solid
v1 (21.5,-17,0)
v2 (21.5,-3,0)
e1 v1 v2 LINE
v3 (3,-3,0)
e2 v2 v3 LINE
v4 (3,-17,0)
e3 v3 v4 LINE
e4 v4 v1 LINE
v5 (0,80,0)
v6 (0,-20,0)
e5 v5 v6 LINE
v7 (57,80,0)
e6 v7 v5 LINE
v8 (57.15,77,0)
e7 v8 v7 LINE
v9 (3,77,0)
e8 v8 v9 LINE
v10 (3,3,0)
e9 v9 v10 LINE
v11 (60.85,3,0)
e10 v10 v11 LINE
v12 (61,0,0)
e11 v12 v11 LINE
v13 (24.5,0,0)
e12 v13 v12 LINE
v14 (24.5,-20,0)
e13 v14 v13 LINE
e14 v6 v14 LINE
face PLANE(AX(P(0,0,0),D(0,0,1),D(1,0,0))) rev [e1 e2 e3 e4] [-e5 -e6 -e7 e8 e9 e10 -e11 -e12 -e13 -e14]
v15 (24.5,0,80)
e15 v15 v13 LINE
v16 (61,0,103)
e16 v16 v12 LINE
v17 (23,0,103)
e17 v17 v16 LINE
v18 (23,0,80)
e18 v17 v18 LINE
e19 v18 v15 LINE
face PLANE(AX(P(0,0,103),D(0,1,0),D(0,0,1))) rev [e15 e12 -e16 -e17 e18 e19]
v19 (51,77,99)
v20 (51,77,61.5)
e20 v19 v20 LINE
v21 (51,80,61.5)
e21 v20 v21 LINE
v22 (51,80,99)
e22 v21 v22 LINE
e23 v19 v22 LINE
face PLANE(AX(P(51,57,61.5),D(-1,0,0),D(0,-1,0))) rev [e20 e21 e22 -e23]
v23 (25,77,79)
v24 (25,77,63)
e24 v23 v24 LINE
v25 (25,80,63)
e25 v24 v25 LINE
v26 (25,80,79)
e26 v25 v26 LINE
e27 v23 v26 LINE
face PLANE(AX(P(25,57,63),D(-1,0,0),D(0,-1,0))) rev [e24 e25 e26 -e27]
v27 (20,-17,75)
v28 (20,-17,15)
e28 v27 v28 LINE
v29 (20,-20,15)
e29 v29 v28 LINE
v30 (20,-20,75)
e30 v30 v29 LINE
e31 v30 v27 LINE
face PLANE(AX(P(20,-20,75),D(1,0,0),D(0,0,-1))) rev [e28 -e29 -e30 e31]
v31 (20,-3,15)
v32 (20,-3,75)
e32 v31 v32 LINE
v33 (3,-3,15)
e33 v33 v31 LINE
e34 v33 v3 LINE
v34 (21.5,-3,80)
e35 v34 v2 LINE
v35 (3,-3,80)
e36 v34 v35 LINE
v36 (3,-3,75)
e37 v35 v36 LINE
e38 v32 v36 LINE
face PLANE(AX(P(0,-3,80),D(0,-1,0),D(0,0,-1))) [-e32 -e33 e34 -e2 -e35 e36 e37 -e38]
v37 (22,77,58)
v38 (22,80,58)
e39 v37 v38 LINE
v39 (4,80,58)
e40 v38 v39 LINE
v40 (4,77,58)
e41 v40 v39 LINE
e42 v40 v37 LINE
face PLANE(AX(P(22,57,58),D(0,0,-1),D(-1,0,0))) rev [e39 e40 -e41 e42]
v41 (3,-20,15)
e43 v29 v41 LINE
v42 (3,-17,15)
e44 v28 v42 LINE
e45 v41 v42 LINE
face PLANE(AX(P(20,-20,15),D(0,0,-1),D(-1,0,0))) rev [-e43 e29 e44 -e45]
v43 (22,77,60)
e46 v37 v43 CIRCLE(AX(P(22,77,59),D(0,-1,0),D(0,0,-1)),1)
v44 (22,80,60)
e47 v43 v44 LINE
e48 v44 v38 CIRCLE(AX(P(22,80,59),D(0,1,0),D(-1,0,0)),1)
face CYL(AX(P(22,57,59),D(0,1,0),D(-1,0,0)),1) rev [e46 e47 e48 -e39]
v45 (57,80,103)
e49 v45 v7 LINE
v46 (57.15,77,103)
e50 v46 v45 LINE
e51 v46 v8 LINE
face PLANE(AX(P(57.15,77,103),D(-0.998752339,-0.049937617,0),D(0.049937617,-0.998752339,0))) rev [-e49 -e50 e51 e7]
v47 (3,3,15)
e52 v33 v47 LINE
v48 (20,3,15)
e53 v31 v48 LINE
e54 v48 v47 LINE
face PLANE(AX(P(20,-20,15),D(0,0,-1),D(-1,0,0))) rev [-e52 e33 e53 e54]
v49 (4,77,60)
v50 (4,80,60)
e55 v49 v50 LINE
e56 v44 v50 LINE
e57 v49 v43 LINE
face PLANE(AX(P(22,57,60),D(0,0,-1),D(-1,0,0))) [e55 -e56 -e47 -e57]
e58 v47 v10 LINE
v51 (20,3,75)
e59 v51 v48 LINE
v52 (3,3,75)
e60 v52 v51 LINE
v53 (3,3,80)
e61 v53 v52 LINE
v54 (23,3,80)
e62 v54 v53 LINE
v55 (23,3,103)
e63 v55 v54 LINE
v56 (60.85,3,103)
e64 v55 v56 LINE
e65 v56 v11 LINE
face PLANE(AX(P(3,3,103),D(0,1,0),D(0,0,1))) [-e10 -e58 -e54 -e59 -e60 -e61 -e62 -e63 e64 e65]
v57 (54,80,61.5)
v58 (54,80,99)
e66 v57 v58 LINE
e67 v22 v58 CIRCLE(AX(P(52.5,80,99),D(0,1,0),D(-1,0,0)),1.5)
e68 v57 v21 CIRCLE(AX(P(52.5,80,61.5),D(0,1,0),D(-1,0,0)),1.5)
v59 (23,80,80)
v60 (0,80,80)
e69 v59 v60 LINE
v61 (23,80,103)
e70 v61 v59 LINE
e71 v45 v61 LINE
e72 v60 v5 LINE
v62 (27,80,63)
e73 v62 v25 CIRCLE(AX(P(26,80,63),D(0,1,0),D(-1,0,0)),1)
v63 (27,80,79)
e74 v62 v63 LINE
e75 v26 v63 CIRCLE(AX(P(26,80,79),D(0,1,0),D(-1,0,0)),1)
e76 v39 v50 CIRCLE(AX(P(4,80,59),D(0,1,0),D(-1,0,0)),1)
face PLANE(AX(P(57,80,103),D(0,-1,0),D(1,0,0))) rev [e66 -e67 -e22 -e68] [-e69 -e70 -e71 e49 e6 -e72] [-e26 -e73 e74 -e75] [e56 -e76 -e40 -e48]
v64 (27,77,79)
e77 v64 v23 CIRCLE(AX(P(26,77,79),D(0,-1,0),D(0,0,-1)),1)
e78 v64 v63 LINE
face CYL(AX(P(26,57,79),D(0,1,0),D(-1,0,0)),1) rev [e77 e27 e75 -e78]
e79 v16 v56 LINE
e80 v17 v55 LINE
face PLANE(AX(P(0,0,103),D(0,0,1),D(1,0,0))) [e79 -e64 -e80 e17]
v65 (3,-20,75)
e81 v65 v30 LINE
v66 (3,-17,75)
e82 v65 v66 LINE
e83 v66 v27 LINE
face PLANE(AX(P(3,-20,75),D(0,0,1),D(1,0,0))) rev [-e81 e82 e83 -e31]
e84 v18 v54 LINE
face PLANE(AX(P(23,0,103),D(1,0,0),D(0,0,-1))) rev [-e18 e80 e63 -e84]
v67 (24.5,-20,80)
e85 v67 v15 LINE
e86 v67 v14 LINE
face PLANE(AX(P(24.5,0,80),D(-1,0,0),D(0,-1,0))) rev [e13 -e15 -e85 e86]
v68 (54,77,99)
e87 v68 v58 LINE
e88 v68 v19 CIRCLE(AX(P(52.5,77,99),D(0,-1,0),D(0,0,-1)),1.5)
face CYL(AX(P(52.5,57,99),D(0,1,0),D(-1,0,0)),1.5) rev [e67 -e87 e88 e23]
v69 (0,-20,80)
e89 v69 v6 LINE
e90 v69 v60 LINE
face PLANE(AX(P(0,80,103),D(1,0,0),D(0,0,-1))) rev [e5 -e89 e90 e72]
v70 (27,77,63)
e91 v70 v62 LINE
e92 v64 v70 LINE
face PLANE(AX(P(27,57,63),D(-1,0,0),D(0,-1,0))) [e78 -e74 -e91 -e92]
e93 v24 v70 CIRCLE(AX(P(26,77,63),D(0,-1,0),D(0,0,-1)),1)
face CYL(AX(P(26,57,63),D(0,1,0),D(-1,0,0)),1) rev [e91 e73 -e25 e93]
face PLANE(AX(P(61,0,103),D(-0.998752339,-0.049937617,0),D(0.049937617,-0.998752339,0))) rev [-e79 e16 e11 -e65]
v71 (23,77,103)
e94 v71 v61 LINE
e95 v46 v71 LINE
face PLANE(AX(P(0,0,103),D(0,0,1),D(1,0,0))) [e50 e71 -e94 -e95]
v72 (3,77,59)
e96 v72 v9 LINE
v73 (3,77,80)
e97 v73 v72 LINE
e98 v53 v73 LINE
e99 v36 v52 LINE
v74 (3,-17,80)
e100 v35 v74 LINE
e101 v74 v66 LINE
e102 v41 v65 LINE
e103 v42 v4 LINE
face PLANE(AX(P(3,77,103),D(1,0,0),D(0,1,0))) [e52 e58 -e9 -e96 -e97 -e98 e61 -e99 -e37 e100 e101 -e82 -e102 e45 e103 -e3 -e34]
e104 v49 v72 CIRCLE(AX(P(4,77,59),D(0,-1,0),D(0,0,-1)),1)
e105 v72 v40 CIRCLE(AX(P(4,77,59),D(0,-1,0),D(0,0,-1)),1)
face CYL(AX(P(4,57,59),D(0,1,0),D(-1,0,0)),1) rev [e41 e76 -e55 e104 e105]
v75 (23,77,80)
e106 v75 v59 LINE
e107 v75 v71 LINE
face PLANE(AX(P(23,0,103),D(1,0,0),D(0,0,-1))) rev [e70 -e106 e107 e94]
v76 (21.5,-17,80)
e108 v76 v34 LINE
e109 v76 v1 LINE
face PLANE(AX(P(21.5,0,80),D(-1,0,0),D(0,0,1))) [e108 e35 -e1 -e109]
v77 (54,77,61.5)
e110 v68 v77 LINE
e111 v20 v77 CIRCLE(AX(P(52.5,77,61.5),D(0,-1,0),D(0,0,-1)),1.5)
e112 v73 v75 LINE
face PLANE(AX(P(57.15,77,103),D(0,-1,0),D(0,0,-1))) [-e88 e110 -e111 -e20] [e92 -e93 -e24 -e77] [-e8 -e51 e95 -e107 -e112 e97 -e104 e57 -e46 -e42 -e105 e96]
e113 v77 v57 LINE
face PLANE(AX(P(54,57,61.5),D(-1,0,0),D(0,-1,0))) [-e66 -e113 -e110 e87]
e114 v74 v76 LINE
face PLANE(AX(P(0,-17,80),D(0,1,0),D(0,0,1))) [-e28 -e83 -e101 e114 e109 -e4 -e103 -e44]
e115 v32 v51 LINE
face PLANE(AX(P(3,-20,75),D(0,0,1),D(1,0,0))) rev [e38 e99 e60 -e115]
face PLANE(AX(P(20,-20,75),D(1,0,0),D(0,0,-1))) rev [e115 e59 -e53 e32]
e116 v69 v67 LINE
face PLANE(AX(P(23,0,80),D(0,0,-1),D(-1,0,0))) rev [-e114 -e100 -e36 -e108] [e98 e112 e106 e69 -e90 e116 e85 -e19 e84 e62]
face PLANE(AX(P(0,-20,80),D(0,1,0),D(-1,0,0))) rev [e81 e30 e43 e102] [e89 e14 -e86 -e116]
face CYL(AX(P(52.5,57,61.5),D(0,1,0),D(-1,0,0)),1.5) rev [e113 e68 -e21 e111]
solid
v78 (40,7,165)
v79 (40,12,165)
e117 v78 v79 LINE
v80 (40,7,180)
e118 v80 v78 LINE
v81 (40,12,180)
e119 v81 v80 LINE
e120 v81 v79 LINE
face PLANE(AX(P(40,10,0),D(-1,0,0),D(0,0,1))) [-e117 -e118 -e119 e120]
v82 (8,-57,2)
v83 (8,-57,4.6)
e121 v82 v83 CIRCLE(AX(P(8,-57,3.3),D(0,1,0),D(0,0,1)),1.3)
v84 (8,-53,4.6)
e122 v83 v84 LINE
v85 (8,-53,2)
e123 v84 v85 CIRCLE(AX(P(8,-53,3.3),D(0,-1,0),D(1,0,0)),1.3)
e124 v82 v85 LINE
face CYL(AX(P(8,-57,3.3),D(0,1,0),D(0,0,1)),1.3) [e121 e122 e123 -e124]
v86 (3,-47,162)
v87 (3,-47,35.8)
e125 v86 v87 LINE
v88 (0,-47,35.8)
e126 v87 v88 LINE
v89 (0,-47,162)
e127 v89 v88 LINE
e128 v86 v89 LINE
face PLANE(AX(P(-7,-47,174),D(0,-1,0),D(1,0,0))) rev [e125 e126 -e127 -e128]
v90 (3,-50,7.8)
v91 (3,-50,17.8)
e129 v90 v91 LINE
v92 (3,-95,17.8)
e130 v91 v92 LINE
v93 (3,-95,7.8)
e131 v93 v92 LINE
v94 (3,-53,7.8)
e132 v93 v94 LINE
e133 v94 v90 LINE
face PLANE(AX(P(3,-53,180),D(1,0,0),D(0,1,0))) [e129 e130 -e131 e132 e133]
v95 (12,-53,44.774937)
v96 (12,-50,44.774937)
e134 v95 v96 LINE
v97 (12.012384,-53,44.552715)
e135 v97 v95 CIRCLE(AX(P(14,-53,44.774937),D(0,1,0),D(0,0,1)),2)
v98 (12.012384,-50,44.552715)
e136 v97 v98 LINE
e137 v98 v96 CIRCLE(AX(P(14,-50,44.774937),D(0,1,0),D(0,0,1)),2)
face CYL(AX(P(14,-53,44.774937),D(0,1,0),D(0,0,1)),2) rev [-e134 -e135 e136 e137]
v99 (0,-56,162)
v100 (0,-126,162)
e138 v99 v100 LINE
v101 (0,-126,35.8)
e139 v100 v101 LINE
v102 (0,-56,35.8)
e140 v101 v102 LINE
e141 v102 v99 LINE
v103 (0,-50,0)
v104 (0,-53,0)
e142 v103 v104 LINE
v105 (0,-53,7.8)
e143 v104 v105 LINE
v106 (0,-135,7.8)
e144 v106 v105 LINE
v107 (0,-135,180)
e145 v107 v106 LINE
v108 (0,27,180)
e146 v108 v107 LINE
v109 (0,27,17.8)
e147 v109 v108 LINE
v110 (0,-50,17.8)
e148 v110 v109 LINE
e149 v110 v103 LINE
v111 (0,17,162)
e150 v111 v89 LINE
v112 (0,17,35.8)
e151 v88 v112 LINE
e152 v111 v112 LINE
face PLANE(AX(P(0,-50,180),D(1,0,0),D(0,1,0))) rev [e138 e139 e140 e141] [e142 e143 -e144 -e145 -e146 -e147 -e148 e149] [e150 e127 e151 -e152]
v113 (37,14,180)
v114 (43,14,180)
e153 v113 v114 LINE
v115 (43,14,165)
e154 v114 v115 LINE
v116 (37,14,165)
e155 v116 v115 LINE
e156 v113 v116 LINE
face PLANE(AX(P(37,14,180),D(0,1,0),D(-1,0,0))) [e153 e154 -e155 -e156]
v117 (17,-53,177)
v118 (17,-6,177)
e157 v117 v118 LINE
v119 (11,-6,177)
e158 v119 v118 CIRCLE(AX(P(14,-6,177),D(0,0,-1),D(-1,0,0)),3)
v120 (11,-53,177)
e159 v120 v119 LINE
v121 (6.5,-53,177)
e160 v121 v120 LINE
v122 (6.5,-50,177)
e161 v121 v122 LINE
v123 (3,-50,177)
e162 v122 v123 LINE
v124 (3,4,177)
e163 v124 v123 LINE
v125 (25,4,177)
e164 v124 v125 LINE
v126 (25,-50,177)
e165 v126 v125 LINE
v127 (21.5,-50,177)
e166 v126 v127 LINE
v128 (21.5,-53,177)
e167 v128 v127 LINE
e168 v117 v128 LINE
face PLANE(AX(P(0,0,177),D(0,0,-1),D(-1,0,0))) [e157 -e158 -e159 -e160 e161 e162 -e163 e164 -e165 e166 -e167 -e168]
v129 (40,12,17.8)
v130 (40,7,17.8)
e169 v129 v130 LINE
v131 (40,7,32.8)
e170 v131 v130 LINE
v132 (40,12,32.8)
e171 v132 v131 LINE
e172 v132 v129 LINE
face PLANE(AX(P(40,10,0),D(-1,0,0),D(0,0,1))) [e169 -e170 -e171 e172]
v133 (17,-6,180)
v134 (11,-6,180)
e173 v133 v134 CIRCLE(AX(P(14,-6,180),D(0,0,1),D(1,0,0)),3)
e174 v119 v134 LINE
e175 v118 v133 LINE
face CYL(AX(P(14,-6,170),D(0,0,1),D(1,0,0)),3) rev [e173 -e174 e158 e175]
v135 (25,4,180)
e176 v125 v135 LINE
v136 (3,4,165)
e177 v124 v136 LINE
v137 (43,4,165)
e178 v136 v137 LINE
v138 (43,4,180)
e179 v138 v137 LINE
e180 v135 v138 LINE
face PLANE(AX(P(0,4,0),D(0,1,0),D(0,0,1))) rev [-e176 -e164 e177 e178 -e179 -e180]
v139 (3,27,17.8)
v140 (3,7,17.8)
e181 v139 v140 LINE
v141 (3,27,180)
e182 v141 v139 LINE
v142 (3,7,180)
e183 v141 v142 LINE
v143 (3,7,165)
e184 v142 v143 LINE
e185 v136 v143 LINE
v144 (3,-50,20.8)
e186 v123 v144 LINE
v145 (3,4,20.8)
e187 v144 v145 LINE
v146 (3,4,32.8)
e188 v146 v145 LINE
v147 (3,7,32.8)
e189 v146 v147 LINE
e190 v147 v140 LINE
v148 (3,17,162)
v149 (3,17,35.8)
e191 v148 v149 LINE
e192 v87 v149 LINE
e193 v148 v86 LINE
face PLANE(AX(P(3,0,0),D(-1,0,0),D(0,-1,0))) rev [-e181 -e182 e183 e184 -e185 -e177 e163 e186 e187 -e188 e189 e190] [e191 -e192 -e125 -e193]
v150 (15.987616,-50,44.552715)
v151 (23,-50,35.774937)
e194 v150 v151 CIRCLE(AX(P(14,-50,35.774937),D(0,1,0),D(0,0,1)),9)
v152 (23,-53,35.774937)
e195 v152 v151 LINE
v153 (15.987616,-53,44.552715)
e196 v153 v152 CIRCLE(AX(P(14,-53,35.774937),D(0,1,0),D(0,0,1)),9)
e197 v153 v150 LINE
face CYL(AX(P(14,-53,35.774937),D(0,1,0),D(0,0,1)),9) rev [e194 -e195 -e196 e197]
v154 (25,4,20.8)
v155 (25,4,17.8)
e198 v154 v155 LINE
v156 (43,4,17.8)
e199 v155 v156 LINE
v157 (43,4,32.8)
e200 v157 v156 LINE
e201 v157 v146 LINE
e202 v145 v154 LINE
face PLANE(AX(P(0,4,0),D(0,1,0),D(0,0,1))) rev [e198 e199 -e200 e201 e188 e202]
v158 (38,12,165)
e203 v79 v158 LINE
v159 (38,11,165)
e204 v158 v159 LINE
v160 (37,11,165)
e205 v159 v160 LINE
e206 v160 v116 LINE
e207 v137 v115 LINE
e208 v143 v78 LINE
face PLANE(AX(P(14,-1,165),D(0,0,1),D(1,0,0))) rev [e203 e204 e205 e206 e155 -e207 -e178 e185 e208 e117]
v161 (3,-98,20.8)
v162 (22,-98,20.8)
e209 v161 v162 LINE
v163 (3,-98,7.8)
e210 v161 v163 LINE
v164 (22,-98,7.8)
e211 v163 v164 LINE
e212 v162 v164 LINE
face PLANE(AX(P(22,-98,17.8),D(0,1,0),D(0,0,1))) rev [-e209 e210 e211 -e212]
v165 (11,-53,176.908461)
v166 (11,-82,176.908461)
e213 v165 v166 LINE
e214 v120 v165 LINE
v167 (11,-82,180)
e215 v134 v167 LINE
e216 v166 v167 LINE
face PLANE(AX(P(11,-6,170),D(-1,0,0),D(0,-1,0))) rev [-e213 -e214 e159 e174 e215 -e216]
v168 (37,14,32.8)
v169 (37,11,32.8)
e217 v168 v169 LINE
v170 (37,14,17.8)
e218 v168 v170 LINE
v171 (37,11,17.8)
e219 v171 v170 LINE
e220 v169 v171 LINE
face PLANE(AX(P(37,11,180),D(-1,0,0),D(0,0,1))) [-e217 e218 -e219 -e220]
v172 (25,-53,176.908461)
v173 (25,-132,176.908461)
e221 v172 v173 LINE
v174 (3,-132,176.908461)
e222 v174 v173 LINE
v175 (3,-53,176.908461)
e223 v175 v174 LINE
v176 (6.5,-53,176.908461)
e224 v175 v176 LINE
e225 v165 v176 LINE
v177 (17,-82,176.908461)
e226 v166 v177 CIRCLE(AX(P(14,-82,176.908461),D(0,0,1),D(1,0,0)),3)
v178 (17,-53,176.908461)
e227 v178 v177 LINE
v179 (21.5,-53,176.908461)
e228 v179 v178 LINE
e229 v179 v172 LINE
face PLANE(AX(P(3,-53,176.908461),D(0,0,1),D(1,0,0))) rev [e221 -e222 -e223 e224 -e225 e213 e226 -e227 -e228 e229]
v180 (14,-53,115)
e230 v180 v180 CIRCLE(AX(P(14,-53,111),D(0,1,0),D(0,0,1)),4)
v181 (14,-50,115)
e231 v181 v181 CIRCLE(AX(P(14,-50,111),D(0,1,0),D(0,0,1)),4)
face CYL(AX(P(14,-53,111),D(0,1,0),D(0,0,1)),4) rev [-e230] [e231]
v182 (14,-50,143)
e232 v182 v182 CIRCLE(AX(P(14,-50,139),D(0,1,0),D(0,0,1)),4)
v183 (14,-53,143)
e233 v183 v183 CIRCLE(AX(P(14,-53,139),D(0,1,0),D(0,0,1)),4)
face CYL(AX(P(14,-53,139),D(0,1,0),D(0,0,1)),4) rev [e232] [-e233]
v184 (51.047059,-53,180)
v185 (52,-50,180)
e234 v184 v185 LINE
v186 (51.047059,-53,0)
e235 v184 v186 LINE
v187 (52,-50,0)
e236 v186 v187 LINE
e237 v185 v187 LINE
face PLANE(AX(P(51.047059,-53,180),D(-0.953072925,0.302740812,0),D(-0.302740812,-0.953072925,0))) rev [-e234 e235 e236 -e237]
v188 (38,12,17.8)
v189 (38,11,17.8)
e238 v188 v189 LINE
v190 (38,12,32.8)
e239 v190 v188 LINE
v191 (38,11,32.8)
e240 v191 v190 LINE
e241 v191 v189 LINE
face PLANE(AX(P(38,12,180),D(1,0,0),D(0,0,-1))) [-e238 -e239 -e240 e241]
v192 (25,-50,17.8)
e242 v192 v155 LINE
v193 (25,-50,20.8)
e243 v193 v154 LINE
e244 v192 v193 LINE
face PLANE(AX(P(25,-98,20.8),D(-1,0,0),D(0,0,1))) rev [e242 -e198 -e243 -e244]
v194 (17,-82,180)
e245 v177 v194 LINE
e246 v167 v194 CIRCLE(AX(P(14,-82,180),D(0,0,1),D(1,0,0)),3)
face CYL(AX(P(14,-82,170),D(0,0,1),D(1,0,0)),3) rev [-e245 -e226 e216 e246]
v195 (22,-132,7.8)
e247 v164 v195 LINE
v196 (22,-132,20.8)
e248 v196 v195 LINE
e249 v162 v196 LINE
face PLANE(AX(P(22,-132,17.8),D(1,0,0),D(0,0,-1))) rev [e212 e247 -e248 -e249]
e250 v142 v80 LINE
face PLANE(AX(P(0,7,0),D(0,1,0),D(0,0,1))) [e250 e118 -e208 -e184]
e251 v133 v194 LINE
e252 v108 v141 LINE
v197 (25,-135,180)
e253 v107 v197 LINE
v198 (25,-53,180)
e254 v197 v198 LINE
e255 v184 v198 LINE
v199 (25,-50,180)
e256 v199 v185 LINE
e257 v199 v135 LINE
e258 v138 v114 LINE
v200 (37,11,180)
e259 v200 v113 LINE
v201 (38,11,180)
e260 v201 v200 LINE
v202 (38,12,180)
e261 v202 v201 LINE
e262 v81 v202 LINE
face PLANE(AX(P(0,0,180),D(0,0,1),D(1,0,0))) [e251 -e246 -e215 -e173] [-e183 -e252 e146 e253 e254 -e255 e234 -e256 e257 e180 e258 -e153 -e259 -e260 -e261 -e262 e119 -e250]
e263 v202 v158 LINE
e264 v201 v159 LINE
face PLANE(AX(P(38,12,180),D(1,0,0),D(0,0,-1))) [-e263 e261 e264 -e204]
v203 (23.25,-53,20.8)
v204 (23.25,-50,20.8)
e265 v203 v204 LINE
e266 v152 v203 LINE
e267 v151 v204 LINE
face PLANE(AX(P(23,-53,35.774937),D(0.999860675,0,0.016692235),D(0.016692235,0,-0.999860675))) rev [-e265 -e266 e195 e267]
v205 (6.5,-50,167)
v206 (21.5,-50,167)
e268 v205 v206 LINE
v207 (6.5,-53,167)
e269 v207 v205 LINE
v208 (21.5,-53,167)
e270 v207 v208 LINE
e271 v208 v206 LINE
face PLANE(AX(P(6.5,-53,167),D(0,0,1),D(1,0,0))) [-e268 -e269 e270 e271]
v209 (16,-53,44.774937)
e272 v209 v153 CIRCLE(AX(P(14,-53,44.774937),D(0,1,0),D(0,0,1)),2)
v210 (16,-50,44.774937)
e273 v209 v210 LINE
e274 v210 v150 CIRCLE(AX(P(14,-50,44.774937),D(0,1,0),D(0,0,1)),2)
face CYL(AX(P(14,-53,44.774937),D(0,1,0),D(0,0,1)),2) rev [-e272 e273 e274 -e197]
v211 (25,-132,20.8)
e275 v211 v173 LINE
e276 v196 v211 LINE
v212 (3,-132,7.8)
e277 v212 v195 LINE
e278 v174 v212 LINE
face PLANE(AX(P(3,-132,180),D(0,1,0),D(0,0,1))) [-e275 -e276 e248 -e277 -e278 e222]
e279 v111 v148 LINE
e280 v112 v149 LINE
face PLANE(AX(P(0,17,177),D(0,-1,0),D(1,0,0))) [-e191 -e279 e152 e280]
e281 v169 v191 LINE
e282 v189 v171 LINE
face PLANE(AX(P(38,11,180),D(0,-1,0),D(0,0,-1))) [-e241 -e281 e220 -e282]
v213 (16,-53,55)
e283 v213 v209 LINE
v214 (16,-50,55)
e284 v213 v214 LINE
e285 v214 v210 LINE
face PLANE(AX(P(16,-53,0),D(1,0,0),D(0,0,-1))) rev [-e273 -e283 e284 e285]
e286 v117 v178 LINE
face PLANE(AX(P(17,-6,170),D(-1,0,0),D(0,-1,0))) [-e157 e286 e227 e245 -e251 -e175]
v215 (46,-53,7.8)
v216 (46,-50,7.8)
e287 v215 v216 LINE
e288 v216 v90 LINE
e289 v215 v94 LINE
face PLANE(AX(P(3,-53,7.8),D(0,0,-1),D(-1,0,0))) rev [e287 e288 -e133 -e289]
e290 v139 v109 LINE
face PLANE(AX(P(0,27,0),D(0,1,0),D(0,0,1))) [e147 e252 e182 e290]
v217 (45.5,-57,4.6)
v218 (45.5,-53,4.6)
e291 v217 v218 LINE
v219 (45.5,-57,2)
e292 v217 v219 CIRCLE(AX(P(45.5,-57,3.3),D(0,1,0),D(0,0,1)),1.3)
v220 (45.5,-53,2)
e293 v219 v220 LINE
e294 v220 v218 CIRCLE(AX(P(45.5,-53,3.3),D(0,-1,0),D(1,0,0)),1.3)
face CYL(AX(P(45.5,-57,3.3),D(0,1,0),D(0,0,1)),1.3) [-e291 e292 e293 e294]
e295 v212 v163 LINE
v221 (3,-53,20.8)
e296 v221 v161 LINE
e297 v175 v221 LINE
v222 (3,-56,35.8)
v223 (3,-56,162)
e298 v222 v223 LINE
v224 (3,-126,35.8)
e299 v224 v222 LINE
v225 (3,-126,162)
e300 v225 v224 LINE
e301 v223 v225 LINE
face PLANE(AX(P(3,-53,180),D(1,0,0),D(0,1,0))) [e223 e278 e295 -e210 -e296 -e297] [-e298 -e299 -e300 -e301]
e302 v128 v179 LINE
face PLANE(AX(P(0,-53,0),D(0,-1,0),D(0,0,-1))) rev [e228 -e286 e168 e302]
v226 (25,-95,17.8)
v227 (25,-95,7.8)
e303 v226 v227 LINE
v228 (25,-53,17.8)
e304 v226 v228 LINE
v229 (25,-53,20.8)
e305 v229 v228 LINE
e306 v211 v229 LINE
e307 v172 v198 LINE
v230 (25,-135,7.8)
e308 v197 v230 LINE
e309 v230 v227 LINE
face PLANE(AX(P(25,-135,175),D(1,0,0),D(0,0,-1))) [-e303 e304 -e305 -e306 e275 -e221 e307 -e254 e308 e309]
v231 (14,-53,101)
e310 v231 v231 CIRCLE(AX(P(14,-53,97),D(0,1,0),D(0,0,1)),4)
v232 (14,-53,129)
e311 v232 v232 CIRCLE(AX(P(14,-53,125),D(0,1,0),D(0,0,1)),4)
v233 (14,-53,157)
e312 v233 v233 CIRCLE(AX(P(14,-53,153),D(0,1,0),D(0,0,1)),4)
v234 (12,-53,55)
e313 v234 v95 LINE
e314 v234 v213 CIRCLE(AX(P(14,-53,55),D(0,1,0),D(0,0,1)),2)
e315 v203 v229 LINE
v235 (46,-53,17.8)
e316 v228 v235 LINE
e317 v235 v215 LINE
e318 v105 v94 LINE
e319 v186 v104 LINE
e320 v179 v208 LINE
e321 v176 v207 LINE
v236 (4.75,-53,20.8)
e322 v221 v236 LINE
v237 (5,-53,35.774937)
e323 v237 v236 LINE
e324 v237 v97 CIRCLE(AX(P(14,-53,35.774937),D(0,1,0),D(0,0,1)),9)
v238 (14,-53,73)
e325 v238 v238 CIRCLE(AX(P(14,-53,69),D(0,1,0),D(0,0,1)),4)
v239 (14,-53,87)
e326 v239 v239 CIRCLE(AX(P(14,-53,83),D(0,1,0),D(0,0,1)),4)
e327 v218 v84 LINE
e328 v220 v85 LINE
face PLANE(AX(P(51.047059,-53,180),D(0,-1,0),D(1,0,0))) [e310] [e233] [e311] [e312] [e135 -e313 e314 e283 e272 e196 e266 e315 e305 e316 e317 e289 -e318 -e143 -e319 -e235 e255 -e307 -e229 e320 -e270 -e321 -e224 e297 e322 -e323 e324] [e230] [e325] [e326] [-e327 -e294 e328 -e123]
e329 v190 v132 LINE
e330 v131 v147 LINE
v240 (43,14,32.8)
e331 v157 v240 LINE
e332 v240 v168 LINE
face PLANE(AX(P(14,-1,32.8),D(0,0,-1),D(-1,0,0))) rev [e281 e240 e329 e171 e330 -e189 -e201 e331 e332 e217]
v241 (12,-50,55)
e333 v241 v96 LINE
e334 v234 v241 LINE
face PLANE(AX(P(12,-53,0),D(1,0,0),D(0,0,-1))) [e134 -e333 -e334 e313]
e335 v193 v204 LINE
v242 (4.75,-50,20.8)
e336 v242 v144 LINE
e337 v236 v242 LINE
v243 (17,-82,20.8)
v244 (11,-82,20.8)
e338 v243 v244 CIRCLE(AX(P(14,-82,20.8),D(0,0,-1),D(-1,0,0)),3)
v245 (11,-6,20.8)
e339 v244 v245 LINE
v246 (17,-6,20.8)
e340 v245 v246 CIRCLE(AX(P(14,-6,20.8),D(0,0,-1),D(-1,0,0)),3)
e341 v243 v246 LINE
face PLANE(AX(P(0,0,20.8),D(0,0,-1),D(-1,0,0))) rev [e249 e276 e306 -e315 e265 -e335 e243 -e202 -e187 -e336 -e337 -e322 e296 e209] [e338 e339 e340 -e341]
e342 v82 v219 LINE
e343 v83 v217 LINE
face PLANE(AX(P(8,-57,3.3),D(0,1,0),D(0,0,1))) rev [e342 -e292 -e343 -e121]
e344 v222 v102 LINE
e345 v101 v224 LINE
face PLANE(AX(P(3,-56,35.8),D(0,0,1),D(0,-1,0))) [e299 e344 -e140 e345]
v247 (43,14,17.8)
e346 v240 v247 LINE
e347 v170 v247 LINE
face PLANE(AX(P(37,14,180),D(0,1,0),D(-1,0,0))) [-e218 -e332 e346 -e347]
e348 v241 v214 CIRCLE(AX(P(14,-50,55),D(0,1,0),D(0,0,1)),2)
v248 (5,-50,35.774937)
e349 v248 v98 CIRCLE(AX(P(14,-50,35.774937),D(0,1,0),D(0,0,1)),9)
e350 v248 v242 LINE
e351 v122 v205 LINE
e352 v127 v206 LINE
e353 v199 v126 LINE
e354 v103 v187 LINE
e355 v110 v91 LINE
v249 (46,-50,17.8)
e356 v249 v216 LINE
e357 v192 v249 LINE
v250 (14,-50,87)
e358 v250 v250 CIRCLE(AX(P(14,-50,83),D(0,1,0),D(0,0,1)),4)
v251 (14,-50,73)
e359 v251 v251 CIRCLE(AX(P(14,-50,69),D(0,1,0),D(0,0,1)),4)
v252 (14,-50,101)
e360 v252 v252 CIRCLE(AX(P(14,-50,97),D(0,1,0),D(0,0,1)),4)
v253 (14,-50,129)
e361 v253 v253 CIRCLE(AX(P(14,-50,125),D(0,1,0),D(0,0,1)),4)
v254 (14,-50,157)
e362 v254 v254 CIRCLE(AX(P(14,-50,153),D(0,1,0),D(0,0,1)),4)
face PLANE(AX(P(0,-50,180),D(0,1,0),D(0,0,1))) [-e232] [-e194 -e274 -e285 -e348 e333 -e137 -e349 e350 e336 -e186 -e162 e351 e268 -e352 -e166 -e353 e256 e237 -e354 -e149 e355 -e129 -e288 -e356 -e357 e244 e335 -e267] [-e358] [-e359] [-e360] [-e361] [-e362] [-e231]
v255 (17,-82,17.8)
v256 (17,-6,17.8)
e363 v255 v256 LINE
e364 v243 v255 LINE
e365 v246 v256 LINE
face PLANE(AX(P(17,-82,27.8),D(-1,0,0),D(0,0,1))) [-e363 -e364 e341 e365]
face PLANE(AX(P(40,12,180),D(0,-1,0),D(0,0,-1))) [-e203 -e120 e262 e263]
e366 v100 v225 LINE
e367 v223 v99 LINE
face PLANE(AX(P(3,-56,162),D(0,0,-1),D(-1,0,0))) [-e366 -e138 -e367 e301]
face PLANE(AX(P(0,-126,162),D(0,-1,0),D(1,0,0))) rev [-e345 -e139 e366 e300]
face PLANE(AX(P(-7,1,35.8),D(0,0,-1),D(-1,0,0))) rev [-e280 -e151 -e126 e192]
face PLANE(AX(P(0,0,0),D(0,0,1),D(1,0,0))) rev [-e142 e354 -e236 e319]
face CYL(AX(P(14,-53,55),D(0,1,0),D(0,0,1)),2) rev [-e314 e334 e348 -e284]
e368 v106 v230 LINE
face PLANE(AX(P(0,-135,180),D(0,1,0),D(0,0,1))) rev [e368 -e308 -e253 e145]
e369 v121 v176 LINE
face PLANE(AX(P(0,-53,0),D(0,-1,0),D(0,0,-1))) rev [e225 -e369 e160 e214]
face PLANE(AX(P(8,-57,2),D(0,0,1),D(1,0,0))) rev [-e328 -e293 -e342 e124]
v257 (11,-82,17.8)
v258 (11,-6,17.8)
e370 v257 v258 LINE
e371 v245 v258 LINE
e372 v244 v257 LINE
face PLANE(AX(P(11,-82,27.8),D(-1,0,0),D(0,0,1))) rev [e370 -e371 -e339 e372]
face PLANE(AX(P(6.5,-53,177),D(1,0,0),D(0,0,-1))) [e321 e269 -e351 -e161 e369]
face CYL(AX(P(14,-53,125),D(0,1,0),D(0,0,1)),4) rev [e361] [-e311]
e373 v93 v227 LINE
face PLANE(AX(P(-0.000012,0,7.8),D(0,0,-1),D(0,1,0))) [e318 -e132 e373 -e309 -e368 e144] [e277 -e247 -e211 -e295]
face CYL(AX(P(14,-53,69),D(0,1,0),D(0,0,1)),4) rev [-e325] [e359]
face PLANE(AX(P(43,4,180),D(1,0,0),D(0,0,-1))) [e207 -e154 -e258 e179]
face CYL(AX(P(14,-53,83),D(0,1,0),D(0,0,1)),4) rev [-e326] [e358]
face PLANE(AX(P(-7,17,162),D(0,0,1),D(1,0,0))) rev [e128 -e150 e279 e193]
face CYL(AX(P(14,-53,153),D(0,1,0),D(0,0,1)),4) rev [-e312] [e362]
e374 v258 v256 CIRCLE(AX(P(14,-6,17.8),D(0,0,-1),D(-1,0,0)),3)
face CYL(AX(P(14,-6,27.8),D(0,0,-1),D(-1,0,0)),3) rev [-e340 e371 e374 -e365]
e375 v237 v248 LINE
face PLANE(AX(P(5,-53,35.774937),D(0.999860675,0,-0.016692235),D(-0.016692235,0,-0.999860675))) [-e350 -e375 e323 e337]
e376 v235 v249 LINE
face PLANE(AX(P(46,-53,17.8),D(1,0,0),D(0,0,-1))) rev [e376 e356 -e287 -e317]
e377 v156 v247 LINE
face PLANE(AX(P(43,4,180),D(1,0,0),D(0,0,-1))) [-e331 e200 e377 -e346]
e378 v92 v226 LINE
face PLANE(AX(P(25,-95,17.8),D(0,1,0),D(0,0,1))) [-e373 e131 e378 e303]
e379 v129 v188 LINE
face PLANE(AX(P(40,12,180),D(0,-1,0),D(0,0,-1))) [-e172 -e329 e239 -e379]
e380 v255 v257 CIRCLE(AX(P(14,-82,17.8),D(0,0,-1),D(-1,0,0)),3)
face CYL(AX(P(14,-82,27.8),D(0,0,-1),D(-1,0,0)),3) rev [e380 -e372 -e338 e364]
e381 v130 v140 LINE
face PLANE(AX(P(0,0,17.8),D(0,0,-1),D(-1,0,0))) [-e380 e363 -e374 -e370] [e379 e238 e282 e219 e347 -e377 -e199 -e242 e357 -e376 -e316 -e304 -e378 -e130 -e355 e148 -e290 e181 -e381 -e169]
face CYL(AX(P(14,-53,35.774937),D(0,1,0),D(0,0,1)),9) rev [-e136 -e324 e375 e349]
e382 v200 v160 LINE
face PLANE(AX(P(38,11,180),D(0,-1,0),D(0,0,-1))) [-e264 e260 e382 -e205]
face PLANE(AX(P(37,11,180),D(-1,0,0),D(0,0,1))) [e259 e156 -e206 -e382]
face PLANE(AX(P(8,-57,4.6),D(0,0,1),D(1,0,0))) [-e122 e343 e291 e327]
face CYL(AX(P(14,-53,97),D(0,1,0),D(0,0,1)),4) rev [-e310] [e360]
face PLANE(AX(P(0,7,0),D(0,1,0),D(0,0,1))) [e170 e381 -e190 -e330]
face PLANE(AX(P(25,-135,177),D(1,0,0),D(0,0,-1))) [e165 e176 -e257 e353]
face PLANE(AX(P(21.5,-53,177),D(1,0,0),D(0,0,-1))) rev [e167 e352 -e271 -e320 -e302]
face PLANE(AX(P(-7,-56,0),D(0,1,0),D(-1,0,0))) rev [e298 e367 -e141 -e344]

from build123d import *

# Parameters (mm, degrees)
EXTRUDE_1_DEPTH           = 103
EXTRUDE_2_DEPTH           = 180
SKETCH_4_W                = 23
SKETCH_4_H                = 23
CUT_EXTRUDE_5_DEPTH       = 80
SKETCH_1_4_W              = 24.5
SKETCH_1_4_H              = 20
SKETCH_1_4_W_2            = 18.5
SKETCH_1_4_H_2            = 14
EXTRUDE_3_DEPTH           = 80
SKETCH_5_W                = 17
SKETCH_5_H                = 60
CUT_EXTRUDE_6_DEPTH       = 23
CUT_EXTRUDE_7_DEPTH       = 23
CUT_EXTRUDE_8_DEPTH       = 23
SKETCH_8_W                = 25
SKETCH_8_H                = 85
EXTRUDE_4_DEPTH           = 5
SKETCH_9_W                = 0.952941176
SKETCH_9_H                = 3
CUT_EXTRUDE_9_DEPTH       = 200
EXTRUDE_5_DEPTH           = 7
CUT_EXTRUDE_12_DEPTH      = 234.122285507
CUT_EXTRUDE_12_DEPTH_BACK = 25
SKETCH_13_W               = 7.8
SKETCH_13_H               = 3
CUT_EXTRUDE_14_DEPTH      = 234.122285507
CUT_EXTRUDE_14_DEPTH_BACK = 3
SKETCH_13_5_W             = 7.8
SKETCH_13_5_H             = 79
SKETCH_15_W               = 25
SKETCH_15_H               = 40
SKETCH_15_W_2             = 19
SKETCH_15_H_2             = 34
EXTRUDE_6_DEPTH           = 10
SKETCH_16_W               = 22
SKETCH_16_H               = 100
EXTRUDE_7_DEPTH           = 3
SKETCH_20_W               = 43
SKETCH_20_H               = 10
CUT_EXTRUDE_15_DEPTH      = 3
SKETCH_24_W               = 3
SKETCH_24_H               = 52
EXTRUDE_8_DEPTH           = 3
SKETCH_25_W               = 25
SKETCH_25_H               = 137
EXTRUDE_9_DEPTH           = 3
SKETCH_28_W               = 15
SKETCH_28_H               = 10
CUT_EXTRUDE_16_DEPTH      = 3
SKETCH_29_W               = 1.908461085
SKETCH_29_H               = 79
CUT_EXTRUDE_17_DEPTH      = 22
CUT_EXTRUDE_18_DEPTH      = 10
CUT_EXTRUDE_19_DEPTH      = 10
SKETCH_30_W               = 15
SKETCH_30_H               = 10
CUT_EXTRUDE_20_DEPTH      = 10
SKETCH_31_W               = 3
SKETCH_31_H               = 34
EXTRUDE_10_DEPTH          = 3
SKETCH_32_W               = 156.2
SKETCH_32_H               = 52
EXTRUDE_11_DEPTH          = 3
EXTRUDE_14_DEPTH          = 5
SKETCH_36_W               = 3
SKETCH_36_H               = 162.2
EXTRUDE_15_DEPTH          = 20
SKETCH_37_W               = 29
SKETCH_37_H               = 162.2
EXTRUDE_16_DEPTH          = 3
SKETCH_37_3_W             = 3
SKETCH_37_3_H             = 162.2
EXTRUDE_17_DEPTH          = 3
CUT_EXTRUDE_START         = -3
CUT_EXTRUDE_23_OUTLINE_R  = 4
CUT_EXTRUDE_23_DEPTH      = 3
EXTRUDE_18_DEPTH          = 162.2
SKETCH_42_W               = 29
SKETCH_42_H               = 132.2
CUT_EXTRUDE_24_DEPTH      = 28
SKETCH_43_W               = 11
SKETCH_43_H               = 12
EXTRUDE_20_DEPTH          = 3
SKETCH_44_W               = 150.108461085
SKETCH_44_H               = 73
CUT_EXTRUDE_26_DEPTH      = 10
SKETCH_47_W               = 156.2
SKETCH_47_H               = 7
EXTRUDE_21_DEPTH          = 3
SKETCH_48_W               = 12
SKETCH_48_H               = 48
SKETCH_48_H_2             = 73
SKETCH_48_W_2             = 11.908461085
EXTRUDE_22_DEPTH          = 3
SKETCH_49_W               = 126.2
SKETCH_49_H               = 3
EXTRUDE_23_DEPTH          = 3


# Read off the part's stored shape, not the designer's step: 컷-돌출23
with BuildPart() as part:
    # 스케치1 → 보스-돌출1 (new body)
    with BuildSketch(Plane.XY):
        Polygon((0, 0), (61, 0), (60.85, 3), (3, 3), (3, 77), (57.15, 77), (57, 80), (0, 80), align=None)
    extrude(amount=EXTRUDE_1_DEPTH)

    # 스케치4 → 컷-돌출5 (cut)
    with BuildSketch(Plane(origin=(0, 80, 0), x_dir=(1, 0, 0), z_dir=(0, 1, 0))):
        with Locations((11.5, -91.5)):
            Rectangle(SKETCH_4_W, SKETCH_4_H)
    extrude(amount=-CUT_EXTRUDE_5_DEPTH, mode=Mode.SUBTRACT)

    # 스케치1<4> → 보스-돌출3 (add)
    with BuildSketch(Plane.XY):
        with Locations((12.25, -10)):
            Rectangle(SKETCH_1_4_W, SKETCH_1_4_H)
        with Locations((12.25, -10)):
            Rectangle(SKETCH_1_4_W_2, SKETCH_1_4_H_2, mode=Mode.SUBTRACT)
    extrude(amount=EXTRUDE_3_DEPTH)

    # 스케치5 → 컷-돌출6 (cut)
    with BuildSketch(Plane(origin=(0, 3, 0), x_dir=(1, 0, 0), z_dir=(0, 1, 0))):
        with Locations((11.5, -45)):
            Rectangle(SKETCH_5_W, SKETCH_5_H)
    extrude(amount=-CUT_EXTRUDE_6_DEPTH, mode=Mode.SUBTRACT)

    # 스케치6 → 컷-돌출7 (cut)
    with BuildSketch(Plane(origin=(0, 80, 0), x_dir=(1, 0, 0), z_dir=(0, 1, 0))):
        with BuildLine():
            Line((27, -63), (27, -79))
            ThreePointArc((27, -79), (26, -80), (25, -79))
            Line((25, -79), (25, -63))
            ThreePointArc((25, -63), (26, -62), (27, -63))
        make_face()
        with BuildLine():
            Line((22, -60), (4, -60))
            ThreePointArc((4, -60), (3, -59), (4, -58))
            Line((4, -58), (22, -58))
            ThreePointArc((22, -58), (23, -59), (22, -60))
        make_face()
    extrude(amount=-CUT_EXTRUDE_7_DEPTH, mode=Mode.SUBTRACT)

    # 스케치7 → 컷-돌출8 (cut)
    with BuildSketch(Plane(origin=(0, 80, 0), x_dir=(1, 0, 0), z_dir=(0, 1, 0))):
        with BuildLine():
            Line((54, -61.5), (54, -99))
            ThreePointArc((54, -99), (52.5, -100.5), (51, -99))
            Line((51, -99), (51, -61.5))
            ThreePointArc((51, -61.5), (52.5, -60), (54, -61.5))
        make_face()
    extrude(amount=-CUT_EXTRUDE_8_DEPTH, mode=Mode.SUBTRACT)


with BuildPart() as body_2:
    # 스케치1<3> → 보스-돌출2 (new body)
    with BuildSketch(Plane.XY):
        Polygon((0, -50), (52, -50), (51.047058824, -53), (3, -53), (3, -132), (25.952941176, -132), (25, -135), (0, -135), align=None)
    extrude(amount=EXTRUDE_2_DEPTH)

    # 스케치8 → 보스-돌출4 (add)
    with BuildSketch(Plane.XY.offset(180)):
        with Locations((12.5, -92.5)):
            Rectangle(SKETCH_8_W, SKETCH_8_H)
    extrude(amount=-EXTRUDE_4_DEPTH)

    # 스케치9 → 컷-돌출9 (cut)
    with BuildSketch(Plane.XY.offset(180)):
        with Locations((25.476470588, -133.5)):
            Rectangle(SKETCH_9_W, SKETCH_9_H)
    extrude(amount=-CUT_EXTRUDE_9_DEPTH, mode=Mode.SUBTRACT)

    # 스케치12 → 보스-돌출5 (add)
    with BuildSketch(Plane(origin=(0, -50, 0), x_dir=(1, 0, 0), z_dir=(0, 1, 0))):
        with BuildLine():
            Line((8, -2), (45.5, -2))
            ThreePointArc((45.5, -2), (46.8, -3.3), (45.5, -4.6))
            Line((45.5, -4.6), (8, -4.6))
            ThreePointArc((8, -4.6), (6.7, -3.3), (8, -2))
        make_face()
    extrude(amount=-EXTRUDE_5_DEPTH)

    # 스케치13 → 컷-돌출12 (cut, two sides: drawn at the far end of the back side and taken through both)
    with BuildSketch(Plane.ZY.offset(-CUT_EXTRUDE_12_DEPTH_BACK)):
        with Locations((3.9, -133.5)):
            Rectangle(SKETCH_13_W, SKETCH_13_H)
    extrude(amount=CUT_EXTRUDE_12_DEPTH + CUT_EXTRUDE_12_DEPTH_BACK, mode=Mode.SUBTRACT)

    # 스케치13<5> → 컷-돌출14 (cut, two sides: drawn at the far end of the back side and taken through both)
    with BuildSketch(Plane.ZY.offset(-CUT_EXTRUDE_14_DEPTH_BACK)):
        with Locations((3.9, -92.5)):
            Rectangle(SKETCH_13_5_W, SKETCH_13_5_H)
    extrude(amount=CUT_EXTRUDE_14_DEPTH + CUT_EXTRUDE_14_DEPTH_BACK, mode=Mode.SUBTRACT)

    # 스케치15 → 보스-돌출6 (add)
    with BuildSketch(Plane(origin=(0, 0, 7.8), x_dir=(-1, 0, 0), z_dir=(0, 0, -1))):
        with Locations((-12.5, -115)):
            Rectangle(SKETCH_15_W, SKETCH_15_H)
        with Locations((-12.5, -115)):
            Rectangle(SKETCH_15_W_2, SKETCH_15_H_2, mode=Mode.SUBTRACT)
    extrude(amount=-EXTRUDE_6_DEPTH)

    # 스케치16 → 보스-돌출7 (add)
    with BuildSketch(Plane.XY.offset(17.8)):
        with Locations((14, -48)):
            Rectangle(SKETCH_16_W, SKETCH_16_H)
    extrude(amount=EXTRUDE_7_DEPTH)

    # 스케치20 → 컷-돌출15 (cut)
    with BuildSketch(Plane(origin=(0, -50, 0), x_dir=(1, 0, 0), z_dir=(0, 1, 0))):
        with Locations((24.5, -12.8)):
            Rectangle(SKETCH_20_W, SKETCH_20_H)
    extrude(amount=-CUT_EXTRUDE_15_DEPTH, mode=Mode.SUBTRACT)

    # 스케치24 → 보스-돌출8 (add)
    with BuildSketch(Plane.ZY.offset(-3)):
        with Locations((19.3, -24)):
            Rectangle(SKETCH_24_W, SKETCH_24_H)
    extrude(amount=EXTRUDE_8_DEPTH)

    # 스케치25 → 보스-돌출9 (add)
    with BuildSketch(Plane.XY.offset(180)):
        with Locations((12.5, -66.5)):
            Rectangle(SKETCH_25_W, SKETCH_25_H)
    extrude(amount=-EXTRUDE_9_DEPTH)

    # 스케치28 → 컷-돌출16 (cut)
    with BuildSketch(Plane(origin=(0, -50, 0), x_dir=(1, 0, 0), z_dir=(0, 1, 0))):
        with Locations((14, -172)):
            Rectangle(SKETCH_28_W, SKETCH_28_H)
    extrude(amount=-CUT_EXTRUDE_16_DEPTH, mode=Mode.SUBTRACT)

    # 스케치29 → 컷-돌출17 (cut)
    with BuildSketch(Plane(origin=(25, 0, 0), x_dir=(0, 0, -1), z_dir=(1, 0, 0))):
        with Locations((-175.954230542, -92.5)):
            Rectangle(SKETCH_29_W, SKETCH_29_H)
    extrude(amount=-CUT_EXTRUDE_17_DEPTH, mode=Mode.SUBTRACT)

    # 스케치26 → 컷-돌출18 (cut)
    with BuildSketch(Plane.XY.offset(180)):
        with BuildLine():
            Line((17, -6), (17, -82))
            ThreePointArc((17, -82), (14, -85), (11, -82))
            Line((11, -82), (11, -6))
            ThreePointArc((11, -6), (14, -3), (17, -6))
        make_face()
    extrude(amount=-CUT_EXTRUDE_18_DEPTH, mode=Mode.SUBTRACT)

    # 스케치21 → 컷-돌출19 (cut)
    with BuildSketch(Plane(origin=(0, 0, 17.8), x_dir=(-1, 0, 0), z_dir=(0, 0, -1))):
        with BuildLine():
            Line((-17, -82), (-17, -6))
            ThreePointArc((-17, -6), (-14, -3), (-11, -6))
            Line((-11, -6), (-11, -82))
            ThreePointArc((-11, -82), (-14, -85), (-17, -82))
        make_face()
    extrude(amount=-CUT_EXTRUDE_19_DEPTH, mode=Mode.SUBTRACT)

    # 스케치30 → 컷-돌출20 (cut)
    with BuildSketch(Plane(origin=(0, -50, 0), x_dir=(1, 0, 0), z_dir=(0, 1, 0))):
        with Locations((14, -25.8)):
            Rectangle(SKETCH_30_W, SKETCH_30_H)
    extrude(amount=-CUT_EXTRUDE_20_DEPTH, mode=Mode.SUBTRACT)

    # 스케치31 → 보스-돌출10 (add)
    with BuildSketch(Plane(origin=(25, 0, 0), x_dir=(0, 0, -1), z_dir=(1, 0, 0))):
        with Locations((-19.3, -115)):
            Rectangle(SKETCH_31_W, SKETCH_31_H)
    extrude(amount=-EXTRUDE_10_DEPTH)

    # 스케치32 → 보스-돌출11 (add)
    with BuildSketch(Plane(origin=(3, 0, 0), x_dir=(0, 0, -1), z_dir=(1, 0, 0))):
        with Locations((-98.9, -24)):
            Rectangle(SKETCH_32_W, SKETCH_32_H)
    extrude(amount=-EXTRUDE_11_DEPTH)

    # 스케치35 → 보스-돌출14 (add)
    with BuildSketch(Plane(origin=(0, 2, 0), x_dir=(1, 0, 0), z_dir=(0, 1, 0))):
        Polygon((25, -20.8), (25, -17.8), (0, -17.8), (0, -180), (25, -180), (25, -177), (3, -177), (3, -20.8), align=None)
    extrude(amount=EXTRUDE_14_DEPTH)

    # 스케치36 → 보스-돌출15 (add)
    with BuildSketch(Plane(origin=(0, 7, 0), x_dir=(1, 0, 0), z_dir=(0, 1, 0))):
        with Locations((1.5, -98.9)):
            Rectangle(SKETCH_36_W, SKETCH_36_H)
    extrude(amount=EXTRUDE_15_DEPTH)

    # 스케치37 → 보스-돌출16 (add)
    with BuildSketch(Plane(origin=(0, 7, 0), x_dir=(1, 0, 0), z_dir=(0, 1, 0))):
        with Locations((28.5, -98.9)):
            Rectangle(SKETCH_37_W, SKETCH_37_H)
    extrude(amount=-EXTRUDE_16_DEPTH)

    # 스케치37<3> → 보스-돌출17 (add)
    with BuildSketch(Plane(origin=(0, 7, 0), x_dir=(1, 0, 0), z_dir=(0, 1, 0))):
        with Locations((41.5, -98.9)):
            Rectangle(SKETCH_37_3_W, SKETCH_37_3_H)
    extrude(amount=EXTRUDE_17_DEPTH)

    # 컷-돌출23 outline → 컷-돌출23 (cut)
    with BuildSketch(Plane(origin=(0, -50, 0), x_dir=(1, 0, 0), z_dir=(0, 1, 0)).offset(CUT_EXTRUDE_START)):
        with BuildLine():
            Line((4.75, -20.8), (5, -35.774937186))
            ThreePointArc((5, -35.774937186), (6.968337898, -41.392385725), (12.01238402, -44.552714963))
            ThreePointArc((12.01238402, -44.552714963), (12.003098405, -44.663653674), (12, -44.774937186))
            Line((12, -44.774937186), (12, -55))
            ThreePointArc((12, -55), (14, -57), (16, -55))
            Line((16, -55), (16, -44.774937186))
            ThreePointArc((16, -44.774937186), (15.996901595, -44.663653674), (15.98761598, -44.552714963))
            ThreePointArc((15.98761598, -44.552714963), (21.031662102, -41.392385725), (23, -35.774937186))
            Line((23, -35.774937186), (23.25, -20.8))
            Line((23.25, -20.8), (21.5, -20.8))
            Line((21.5, -20.8), (21.5, -30.8))
            Line((21.5, -30.8), (6.5, -30.8))
            Line((6.5, -30.8), (6.5, -20.8))
            Line((6.5, -20.8), (4.75, -20.8))
        make_face()
        with Locations((14, -69)):
            Circle(CUT_EXTRUDE_23_OUTLINE_R)
        with Locations((14, -153)):
            Circle(CUT_EXTRUDE_23_OUTLINE_R)
        with Locations((14, -139)):
            Circle(CUT_EXTRUDE_23_OUTLINE_R)
        with Locations((14, -125)):
            Circle(CUT_EXTRUDE_23_OUTLINE_R)
        with Locations((14, -111)):
            Circle(CUT_EXTRUDE_23_OUTLINE_R)
        with Locations((14, -97)):
            Circle(CUT_EXTRUDE_23_OUTLINE_R)
        with Locations((14, -83)):
            Circle(CUT_EXTRUDE_23_OUTLINE_R)
    extrude(amount=CUT_EXTRUDE_23_DEPTH, mode=Mode.SUBTRACT)

    # 스케치41 → 보스-돌출18 (add)
    with BuildSketch(Plane(origin=(0, 0, 17.8), x_dir=(-1, 0, 0), z_dir=(0, 0, -1))):
        Polygon((-40, 10), (-40, 12), (-38, 12), (-38, 11), (-37, 11), (-37, 14), (-43, 14), (-43, 10), align=None)
    extrude(amount=-EXTRUDE_18_DEPTH)

    # 스케치42 → 컷-돌출24 (cut)
    with BuildSketch(Plane(origin=(0, 27, 0), x_dir=(1, 0, 0), z_dir=(0, 1, 0))):
        with Locations((28.5, -98.9)):
            Rectangle(SKETCH_42_W, SKETCH_42_H)
    extrude(amount=-CUT_EXTRUDE_24_DEPTH, mode=Mode.SUBTRACT)

    # 스케치43 → 보스-돌출20 (add)
    with BuildSketch(Plane(origin=(0, 7, 0), x_dir=(1, 0, 0), z_dir=(0, 1, 0))):
        with Locations((8.5, -171)):
            Rectangle(SKETCH_43_W, SKETCH_43_H)
        with Locations((8.5, -26.8)):
            Rectangle(SKETCH_43_W, SKETCH_43_H)
    extrude(amount=-EXTRUDE_20_DEPTH)

    # 스케치44 → 컷-돌출26 (cut)
    with BuildSketch(Plane(origin=(3, 0, 0), x_dir=(0, 0, -1), z_dir=(1, 0, 0))):
        with Locations((-98.854230543, -92.5)):
            Rectangle(SKETCH_44_W, SKETCH_44_H)
        Polygon((-177, 24), (-20.8, 24), (-20.8, 17), (-35.8, 17), (-35.8, 1), (-23.8, 1), (-23.8, -47), (-174, -47), (-174, 1), (-162, 1), (-162, 17), (-177, 17), align=None)
    extrude(amount=-CUT_EXTRUDE_26_DEPTH, mode=Mode.SUBTRACT)

    # 스케치47 → 보스-돌출21 (add)
    with BuildSketch(Plane(origin=(3, 0, 0), x_dir=(0, 0, -1), z_dir=(1, 0, 0))):
        with Locations((-98.9, 20.5)):
            Rectangle(SKETCH_47_W, SKETCH_47_H)
    extrude(amount=-EXTRUDE_21_DEPTH)

    # 스케치48 → 보스-돌출22 (add)
    with BuildSketch(Plane.ZY):
        with Locations((29.8, -23)):
            Rectangle(SKETCH_48_W, SKETCH_48_H)
        with Locations((168, -23)):
            Rectangle(SKETCH_48_W, SKETCH_48_H)
        with Locations((29.8, -92.5)):
            Rectangle(SKETCH_48_W, SKETCH_48_H_2)
        with Locations((167.954230542, -92.5)):
            Rectangle(SKETCH_48_W_2, SKETCH_48_H_2)
    extrude(amount=-EXTRUDE_22_DEPTH)

    # 스케치49 → 보스-돌출23 (add)
    with BuildSketch(Plane(origin=(3, 0, 0), x_dir=(0, 0, -1), z_dir=(1, 0, 0))):
        with Locations((-98.9, -127.5)):
            Rectangle(SKETCH_49_W, SKETCH_49_H)
    extrude(amount=-EXTRUDE_23_DEPTH)


solid = Compound([part.part, body_2.part])
